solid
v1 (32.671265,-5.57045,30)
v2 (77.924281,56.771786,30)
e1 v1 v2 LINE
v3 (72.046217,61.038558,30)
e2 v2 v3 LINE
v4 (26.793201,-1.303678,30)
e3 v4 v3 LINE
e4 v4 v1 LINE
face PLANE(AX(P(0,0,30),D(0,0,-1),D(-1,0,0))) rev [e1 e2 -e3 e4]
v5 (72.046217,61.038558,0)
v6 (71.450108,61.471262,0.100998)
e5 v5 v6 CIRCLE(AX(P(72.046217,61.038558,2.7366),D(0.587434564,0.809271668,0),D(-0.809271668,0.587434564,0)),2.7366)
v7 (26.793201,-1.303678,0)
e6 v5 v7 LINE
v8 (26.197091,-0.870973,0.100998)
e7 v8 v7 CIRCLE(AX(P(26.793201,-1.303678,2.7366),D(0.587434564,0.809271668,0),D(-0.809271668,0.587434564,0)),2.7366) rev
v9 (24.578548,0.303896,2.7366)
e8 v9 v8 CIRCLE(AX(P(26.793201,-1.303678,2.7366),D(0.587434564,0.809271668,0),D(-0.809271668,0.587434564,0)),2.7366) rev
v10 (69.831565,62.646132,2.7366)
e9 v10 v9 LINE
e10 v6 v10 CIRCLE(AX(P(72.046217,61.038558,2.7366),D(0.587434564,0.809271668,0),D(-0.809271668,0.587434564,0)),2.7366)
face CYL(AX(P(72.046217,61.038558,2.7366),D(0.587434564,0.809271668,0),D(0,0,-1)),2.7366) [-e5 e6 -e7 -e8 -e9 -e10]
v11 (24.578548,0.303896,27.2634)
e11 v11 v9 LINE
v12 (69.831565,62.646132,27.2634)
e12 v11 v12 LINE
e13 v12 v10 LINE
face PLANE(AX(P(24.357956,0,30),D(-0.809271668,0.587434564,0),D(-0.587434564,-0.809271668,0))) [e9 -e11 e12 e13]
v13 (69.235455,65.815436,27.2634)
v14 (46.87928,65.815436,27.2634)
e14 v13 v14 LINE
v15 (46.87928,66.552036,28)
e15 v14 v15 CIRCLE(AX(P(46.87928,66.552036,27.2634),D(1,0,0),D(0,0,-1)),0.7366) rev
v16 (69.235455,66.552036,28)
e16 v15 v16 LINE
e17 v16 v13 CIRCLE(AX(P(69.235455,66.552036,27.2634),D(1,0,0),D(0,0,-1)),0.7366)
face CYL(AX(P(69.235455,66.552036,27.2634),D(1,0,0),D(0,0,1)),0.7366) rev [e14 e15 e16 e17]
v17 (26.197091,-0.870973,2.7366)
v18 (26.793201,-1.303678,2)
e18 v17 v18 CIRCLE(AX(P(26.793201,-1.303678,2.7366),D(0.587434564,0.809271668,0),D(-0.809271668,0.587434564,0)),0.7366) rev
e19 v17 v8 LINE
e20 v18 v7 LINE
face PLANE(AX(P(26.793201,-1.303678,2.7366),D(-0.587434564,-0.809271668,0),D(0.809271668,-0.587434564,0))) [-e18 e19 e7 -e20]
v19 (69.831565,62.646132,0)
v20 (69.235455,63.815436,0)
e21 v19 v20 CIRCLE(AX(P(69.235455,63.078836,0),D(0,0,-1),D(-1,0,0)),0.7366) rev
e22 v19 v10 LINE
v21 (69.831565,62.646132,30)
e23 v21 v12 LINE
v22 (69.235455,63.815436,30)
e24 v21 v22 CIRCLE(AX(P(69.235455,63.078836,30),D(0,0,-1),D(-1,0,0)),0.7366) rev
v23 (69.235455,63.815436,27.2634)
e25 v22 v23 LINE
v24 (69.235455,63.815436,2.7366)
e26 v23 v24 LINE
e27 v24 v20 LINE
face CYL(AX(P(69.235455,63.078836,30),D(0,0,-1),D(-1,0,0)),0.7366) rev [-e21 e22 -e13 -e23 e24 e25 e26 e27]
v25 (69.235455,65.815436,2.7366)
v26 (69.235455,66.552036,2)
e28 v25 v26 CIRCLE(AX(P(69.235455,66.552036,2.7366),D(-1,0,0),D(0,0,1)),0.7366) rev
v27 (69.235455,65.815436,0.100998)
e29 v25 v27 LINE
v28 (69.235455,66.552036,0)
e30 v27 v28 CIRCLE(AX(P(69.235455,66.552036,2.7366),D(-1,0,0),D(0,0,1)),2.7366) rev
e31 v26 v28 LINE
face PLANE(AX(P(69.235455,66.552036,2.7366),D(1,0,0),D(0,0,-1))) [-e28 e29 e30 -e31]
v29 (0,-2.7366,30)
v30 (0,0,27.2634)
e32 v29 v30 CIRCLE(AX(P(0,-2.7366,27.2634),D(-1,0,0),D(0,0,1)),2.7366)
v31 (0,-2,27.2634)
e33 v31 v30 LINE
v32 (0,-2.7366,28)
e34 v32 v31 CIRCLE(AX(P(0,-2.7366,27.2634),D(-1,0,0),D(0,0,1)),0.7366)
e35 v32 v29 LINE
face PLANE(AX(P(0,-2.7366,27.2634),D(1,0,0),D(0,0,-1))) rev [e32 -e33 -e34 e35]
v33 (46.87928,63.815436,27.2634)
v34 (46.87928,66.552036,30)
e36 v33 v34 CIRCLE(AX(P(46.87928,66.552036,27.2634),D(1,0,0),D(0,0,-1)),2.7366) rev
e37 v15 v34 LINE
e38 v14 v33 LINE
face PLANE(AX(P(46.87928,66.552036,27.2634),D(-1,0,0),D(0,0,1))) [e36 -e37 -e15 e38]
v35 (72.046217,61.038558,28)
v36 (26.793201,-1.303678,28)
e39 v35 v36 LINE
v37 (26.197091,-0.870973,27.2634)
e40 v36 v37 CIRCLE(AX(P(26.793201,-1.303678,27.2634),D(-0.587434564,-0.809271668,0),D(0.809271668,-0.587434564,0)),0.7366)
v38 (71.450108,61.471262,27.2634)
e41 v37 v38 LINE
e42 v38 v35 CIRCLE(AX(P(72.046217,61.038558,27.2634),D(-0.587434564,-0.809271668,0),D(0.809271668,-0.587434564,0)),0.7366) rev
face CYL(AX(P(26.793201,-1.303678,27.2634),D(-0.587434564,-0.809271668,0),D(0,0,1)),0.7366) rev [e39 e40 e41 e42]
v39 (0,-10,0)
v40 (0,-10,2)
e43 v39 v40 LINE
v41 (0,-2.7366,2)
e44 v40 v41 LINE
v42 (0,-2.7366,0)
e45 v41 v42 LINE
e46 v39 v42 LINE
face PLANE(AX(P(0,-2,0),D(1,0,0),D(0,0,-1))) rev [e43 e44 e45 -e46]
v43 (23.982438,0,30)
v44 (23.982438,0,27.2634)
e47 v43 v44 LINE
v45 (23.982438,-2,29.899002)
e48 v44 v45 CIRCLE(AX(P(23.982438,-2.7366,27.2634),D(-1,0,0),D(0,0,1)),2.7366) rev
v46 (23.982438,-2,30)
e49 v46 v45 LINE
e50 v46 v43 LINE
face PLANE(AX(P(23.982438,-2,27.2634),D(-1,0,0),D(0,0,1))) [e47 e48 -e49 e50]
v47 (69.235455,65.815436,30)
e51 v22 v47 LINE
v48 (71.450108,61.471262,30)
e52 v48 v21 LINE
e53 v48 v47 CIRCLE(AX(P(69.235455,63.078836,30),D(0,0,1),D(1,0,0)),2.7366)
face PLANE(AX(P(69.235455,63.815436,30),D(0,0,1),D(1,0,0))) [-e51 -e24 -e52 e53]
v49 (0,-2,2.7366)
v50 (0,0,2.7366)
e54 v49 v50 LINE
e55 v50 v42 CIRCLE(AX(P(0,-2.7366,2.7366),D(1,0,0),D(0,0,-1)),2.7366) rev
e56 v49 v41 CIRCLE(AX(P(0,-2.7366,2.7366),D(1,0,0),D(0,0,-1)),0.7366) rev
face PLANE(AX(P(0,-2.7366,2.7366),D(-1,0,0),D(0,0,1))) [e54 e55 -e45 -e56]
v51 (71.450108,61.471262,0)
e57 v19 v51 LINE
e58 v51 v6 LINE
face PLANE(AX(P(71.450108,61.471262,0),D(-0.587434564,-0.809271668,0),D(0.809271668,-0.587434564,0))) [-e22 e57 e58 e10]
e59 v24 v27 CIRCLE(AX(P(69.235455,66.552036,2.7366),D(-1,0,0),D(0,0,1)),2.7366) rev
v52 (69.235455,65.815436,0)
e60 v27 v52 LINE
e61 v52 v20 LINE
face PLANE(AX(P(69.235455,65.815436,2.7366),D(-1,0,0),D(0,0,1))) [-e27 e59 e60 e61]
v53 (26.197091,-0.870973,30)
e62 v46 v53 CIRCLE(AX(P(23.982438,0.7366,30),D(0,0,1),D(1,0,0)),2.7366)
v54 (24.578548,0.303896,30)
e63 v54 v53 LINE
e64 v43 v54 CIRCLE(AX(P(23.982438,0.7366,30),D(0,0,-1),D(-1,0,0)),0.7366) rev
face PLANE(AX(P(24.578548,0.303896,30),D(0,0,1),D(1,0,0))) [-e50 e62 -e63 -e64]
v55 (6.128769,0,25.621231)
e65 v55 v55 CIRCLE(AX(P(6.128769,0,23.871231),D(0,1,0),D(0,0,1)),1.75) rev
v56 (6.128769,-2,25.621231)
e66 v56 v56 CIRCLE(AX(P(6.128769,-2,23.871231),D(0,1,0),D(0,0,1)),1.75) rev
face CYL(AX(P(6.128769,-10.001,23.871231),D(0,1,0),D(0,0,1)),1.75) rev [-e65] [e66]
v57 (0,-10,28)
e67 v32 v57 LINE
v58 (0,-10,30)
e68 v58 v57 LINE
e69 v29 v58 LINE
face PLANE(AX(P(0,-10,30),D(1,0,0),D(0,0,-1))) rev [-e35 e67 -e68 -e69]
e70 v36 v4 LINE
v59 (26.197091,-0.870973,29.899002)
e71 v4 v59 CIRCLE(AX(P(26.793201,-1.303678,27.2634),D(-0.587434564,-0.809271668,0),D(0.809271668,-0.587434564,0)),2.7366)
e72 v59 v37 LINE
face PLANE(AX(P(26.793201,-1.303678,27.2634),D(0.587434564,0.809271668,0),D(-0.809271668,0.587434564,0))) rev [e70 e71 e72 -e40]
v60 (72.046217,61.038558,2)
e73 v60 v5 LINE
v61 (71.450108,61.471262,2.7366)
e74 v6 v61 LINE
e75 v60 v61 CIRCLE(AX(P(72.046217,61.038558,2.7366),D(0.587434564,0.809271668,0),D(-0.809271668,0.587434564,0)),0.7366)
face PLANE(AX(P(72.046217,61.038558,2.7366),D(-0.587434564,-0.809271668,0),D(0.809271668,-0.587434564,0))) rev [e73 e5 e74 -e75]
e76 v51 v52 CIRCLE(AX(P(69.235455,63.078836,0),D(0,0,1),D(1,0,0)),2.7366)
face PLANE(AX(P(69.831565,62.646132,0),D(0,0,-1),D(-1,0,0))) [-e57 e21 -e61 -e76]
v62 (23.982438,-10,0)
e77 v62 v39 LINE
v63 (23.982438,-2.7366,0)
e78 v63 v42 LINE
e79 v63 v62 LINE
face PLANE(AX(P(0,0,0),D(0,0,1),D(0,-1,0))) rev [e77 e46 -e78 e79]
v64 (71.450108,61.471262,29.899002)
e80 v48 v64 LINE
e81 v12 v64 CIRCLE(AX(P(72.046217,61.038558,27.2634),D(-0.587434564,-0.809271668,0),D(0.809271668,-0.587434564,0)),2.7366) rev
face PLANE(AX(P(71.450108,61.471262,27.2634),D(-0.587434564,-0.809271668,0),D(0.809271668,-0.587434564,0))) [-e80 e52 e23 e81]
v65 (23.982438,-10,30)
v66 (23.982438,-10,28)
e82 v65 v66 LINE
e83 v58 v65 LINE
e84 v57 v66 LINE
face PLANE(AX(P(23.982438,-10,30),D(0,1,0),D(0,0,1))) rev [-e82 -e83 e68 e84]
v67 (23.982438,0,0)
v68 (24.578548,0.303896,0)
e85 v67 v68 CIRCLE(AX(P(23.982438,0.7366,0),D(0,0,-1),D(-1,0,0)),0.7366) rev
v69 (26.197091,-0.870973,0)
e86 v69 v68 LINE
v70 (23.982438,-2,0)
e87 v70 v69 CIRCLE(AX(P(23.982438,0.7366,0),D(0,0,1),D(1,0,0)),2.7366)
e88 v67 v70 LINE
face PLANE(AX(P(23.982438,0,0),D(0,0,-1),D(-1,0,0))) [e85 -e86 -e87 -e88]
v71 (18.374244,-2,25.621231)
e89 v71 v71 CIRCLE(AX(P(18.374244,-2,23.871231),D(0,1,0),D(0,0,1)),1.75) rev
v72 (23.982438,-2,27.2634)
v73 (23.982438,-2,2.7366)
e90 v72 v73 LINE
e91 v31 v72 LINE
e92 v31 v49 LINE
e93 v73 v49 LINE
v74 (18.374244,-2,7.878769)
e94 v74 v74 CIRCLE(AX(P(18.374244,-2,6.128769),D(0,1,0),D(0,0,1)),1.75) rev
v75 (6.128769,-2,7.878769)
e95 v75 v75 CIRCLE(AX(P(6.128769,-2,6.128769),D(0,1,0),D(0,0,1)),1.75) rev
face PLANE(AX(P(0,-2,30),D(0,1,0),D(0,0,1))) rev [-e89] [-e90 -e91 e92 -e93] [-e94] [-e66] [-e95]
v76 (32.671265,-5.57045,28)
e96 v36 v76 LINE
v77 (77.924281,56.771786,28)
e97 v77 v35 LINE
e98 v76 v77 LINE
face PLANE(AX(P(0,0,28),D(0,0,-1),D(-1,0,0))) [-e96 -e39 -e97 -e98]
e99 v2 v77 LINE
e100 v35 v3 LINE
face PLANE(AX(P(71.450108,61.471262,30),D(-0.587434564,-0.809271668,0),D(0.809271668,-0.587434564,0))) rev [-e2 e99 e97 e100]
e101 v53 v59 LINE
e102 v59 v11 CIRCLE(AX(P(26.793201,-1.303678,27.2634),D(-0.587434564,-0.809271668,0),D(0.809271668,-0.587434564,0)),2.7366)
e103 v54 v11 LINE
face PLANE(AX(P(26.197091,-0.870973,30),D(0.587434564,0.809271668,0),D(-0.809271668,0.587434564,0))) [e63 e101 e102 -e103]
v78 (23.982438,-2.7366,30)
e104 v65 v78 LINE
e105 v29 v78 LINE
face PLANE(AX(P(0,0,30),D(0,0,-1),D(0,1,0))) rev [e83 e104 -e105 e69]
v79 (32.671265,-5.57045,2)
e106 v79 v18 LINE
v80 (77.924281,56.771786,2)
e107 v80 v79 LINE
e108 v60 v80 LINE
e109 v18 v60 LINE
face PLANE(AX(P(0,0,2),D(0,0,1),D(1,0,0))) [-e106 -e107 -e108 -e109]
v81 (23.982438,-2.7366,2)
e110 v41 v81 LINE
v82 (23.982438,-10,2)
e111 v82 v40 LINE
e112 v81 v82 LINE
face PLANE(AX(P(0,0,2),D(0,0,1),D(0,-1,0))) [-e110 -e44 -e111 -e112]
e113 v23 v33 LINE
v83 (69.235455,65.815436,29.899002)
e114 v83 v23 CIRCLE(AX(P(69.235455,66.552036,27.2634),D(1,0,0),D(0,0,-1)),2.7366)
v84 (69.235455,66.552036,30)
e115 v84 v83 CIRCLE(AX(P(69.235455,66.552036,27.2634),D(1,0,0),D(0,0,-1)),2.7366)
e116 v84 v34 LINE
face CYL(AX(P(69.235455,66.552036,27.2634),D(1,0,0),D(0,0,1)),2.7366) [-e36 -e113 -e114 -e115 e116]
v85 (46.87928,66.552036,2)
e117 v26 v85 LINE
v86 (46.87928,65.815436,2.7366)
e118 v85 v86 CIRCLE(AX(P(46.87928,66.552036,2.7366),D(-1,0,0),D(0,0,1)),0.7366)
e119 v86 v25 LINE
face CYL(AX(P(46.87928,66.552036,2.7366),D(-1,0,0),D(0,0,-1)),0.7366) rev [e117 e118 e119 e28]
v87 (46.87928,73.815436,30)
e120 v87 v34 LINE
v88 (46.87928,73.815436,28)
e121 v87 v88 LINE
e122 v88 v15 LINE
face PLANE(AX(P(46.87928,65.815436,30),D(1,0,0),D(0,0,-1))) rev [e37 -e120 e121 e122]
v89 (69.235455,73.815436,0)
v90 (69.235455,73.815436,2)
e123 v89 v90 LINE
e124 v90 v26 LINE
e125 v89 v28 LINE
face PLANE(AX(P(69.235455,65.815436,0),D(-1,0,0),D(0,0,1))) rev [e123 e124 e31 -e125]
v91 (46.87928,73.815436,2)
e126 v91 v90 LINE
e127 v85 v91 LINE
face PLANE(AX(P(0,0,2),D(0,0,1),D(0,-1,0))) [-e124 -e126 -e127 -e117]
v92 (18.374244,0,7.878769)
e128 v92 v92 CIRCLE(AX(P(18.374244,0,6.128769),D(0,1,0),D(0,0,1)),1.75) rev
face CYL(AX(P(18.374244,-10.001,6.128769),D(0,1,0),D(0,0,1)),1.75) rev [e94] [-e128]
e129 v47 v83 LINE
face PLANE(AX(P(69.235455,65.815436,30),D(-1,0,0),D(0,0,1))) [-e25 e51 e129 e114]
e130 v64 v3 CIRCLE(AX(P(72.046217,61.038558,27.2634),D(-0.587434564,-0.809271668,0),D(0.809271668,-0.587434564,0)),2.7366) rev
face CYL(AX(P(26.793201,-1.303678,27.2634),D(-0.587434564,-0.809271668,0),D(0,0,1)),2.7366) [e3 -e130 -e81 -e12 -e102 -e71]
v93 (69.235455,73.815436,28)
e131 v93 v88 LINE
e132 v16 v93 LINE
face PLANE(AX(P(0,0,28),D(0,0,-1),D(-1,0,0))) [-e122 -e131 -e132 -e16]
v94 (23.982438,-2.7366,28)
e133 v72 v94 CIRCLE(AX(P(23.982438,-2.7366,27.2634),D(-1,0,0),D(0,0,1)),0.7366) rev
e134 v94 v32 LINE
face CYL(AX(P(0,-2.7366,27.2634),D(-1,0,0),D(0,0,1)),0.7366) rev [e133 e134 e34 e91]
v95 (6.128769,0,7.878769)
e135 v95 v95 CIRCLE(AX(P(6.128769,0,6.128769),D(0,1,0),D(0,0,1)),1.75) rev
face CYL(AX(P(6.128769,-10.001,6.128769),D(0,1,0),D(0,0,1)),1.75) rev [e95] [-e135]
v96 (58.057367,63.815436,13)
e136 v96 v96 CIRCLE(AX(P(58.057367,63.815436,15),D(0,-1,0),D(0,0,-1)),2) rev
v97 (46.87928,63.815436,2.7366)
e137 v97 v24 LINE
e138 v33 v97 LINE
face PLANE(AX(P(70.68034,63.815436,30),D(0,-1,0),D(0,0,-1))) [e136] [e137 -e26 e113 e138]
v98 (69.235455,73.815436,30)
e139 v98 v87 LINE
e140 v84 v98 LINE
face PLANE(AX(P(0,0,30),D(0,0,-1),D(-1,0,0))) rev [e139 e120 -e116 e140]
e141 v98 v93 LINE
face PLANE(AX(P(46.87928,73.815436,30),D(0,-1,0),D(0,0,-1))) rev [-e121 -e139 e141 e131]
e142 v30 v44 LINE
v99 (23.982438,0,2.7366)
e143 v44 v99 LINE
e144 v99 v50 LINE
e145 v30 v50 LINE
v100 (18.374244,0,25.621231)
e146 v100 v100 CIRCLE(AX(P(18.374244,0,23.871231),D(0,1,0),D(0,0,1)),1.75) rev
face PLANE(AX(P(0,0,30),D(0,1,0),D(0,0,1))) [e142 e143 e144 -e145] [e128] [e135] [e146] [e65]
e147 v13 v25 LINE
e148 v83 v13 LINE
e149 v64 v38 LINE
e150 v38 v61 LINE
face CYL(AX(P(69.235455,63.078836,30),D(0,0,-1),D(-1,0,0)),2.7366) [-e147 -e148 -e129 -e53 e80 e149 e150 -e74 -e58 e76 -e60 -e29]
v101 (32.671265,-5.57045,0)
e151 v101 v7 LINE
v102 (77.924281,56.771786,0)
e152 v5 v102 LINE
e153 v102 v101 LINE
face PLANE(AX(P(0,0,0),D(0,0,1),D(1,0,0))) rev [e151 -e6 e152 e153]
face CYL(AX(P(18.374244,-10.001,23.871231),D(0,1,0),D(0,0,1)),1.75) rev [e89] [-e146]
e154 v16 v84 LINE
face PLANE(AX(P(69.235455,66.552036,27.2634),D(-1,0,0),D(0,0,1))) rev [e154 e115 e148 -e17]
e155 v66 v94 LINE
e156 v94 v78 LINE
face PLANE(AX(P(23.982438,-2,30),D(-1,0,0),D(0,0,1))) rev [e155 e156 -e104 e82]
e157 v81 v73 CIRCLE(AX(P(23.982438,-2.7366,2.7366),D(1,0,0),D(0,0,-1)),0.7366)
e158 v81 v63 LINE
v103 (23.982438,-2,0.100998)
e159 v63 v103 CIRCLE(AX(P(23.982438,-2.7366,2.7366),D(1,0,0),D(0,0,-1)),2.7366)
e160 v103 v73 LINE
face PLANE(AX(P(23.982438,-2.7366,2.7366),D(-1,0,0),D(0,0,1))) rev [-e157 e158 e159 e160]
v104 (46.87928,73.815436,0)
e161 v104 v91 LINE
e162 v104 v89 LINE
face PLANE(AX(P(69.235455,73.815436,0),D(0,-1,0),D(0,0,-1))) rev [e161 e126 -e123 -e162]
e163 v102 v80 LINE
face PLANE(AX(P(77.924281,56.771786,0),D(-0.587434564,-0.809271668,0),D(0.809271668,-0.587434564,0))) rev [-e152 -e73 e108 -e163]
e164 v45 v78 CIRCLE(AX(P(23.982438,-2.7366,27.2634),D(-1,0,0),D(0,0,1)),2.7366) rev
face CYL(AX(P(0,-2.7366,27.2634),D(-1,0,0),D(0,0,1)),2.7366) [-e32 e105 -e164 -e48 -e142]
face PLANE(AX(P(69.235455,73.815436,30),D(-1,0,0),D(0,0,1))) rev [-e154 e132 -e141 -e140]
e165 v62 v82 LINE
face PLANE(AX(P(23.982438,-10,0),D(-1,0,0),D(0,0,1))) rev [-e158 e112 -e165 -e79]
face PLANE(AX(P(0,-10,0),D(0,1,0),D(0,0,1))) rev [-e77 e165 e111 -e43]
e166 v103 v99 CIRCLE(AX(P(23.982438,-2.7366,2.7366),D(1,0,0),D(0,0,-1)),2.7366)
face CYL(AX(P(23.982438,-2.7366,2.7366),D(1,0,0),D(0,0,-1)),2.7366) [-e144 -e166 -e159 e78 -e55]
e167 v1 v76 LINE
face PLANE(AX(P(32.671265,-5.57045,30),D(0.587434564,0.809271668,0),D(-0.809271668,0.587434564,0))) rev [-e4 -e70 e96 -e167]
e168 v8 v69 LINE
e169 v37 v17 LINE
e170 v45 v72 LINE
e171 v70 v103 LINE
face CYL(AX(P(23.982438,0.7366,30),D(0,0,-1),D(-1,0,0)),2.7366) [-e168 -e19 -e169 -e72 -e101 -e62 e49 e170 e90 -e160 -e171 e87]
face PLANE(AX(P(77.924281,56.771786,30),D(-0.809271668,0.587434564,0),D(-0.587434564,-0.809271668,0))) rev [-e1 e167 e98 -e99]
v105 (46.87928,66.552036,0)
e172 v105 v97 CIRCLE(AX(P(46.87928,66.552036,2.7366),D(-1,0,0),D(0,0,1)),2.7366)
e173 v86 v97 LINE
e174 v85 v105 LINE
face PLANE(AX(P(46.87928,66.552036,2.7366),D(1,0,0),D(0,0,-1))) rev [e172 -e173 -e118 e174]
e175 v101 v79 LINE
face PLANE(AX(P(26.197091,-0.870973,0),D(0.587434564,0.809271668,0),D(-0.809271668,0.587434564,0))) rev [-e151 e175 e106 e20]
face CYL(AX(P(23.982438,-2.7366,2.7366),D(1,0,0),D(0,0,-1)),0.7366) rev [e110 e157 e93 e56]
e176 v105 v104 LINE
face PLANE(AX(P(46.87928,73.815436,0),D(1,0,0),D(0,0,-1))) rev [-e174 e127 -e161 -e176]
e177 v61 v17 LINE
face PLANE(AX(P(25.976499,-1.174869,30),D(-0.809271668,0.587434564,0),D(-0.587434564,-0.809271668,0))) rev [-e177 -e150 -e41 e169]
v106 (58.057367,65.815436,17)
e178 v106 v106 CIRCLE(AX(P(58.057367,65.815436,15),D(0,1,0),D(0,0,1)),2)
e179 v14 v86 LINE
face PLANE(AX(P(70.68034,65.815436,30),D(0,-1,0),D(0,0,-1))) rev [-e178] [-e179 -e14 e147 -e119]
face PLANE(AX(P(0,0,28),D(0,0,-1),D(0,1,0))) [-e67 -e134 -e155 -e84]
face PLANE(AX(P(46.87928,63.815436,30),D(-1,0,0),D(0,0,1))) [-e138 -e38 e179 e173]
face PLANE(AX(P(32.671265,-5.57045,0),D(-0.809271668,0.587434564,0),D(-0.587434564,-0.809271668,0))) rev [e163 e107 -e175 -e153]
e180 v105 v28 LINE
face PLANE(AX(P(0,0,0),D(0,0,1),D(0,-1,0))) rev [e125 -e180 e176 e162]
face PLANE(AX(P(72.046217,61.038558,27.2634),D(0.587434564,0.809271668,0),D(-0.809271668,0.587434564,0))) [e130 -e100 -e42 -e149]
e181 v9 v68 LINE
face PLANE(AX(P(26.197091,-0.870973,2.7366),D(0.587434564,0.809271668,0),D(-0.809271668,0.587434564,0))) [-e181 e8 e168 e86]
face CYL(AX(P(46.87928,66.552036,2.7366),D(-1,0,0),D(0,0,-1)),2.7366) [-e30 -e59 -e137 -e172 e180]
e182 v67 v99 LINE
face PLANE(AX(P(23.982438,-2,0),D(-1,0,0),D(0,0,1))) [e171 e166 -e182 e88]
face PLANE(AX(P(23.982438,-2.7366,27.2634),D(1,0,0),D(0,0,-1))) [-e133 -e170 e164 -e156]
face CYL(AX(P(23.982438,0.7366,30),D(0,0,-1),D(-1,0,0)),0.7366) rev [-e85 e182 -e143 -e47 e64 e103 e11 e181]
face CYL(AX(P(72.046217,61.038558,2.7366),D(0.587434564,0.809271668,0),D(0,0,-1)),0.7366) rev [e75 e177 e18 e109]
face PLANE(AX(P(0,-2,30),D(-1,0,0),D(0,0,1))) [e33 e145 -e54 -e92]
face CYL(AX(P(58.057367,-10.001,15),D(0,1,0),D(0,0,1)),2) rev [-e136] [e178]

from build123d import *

# Parameters (mm, degrees)
BASE_FLANGE1_DEPTH             = 30
EDGE_FLANGE3_STRIP_W           = 9.4732
EDGE_FLANGE3_STRIP_H           = 2
EDGE_FLANGE3_STRIP_CUT_DEPTH   = 23.982438423
EDGE_FLANGE3_STRIP_2_W         = 9.4732
EDGE_FLANGE3_STRIP_2_H         = 2
EDGE_FLANGE3_STRIP_CUT_2_DEPTH = 23.982438423
EDGE_FLANGE3_STRIP_3_W         = 9.4732
EDGE_FLANGE3_STRIP_3_H         = 2
EDGE_FLANGE3_STRIP_CUT_3_DEPTH = 22.356175112
EDGE_FLANGE3_STRIP_4_W         = 9.4732
EDGE_FLANGE3_STRIP_4_H         = 2
EDGE_FLANGE3_STRIP_CUT_4_DEPTH = 22.356175112
EDGE_FLANGE3_STRIP_5_W         = 9.4732
EDGE_FLANGE3_STRIP_5_H         = 2
EDGE_FLANGE3_STRIP_CUT_5_DEPTH = 77.034991311
EDGE_FLANGE3_STRIP_6_W         = 9.4732
EDGE_FLANGE3_STRIP_6_H         = 2
EDGE_FLANGE3_STRIP_CUT_6_DEPTH = 77.034991311
EDGE_FLANGE3_DEPTH             = 23.982438423
EDGE_FLANGE3_BEND_DEPTH        = 23.982438423
EDGE_FLANGE3_BEND_2_DEPTH      = 22.356175112
EDGE_FLANGE3_BEND_3_DEPTH      = 22.356175112
EDGE_FLANGE3_BEND_4_DEPTH      = 77.034991311
EDGE_FLANGE3_BEND_5_DEPTH      = 77.034991311
CUT_EXTRUDE1_REACH             = 114.784
SKETCH35_R                     = 1.75
SKETCH35_R_2                   = 2


# Sheet-metal steps are written as plain solids
with BuildPart() as part:
    # Sketch1 → Base-Flange1 (new body)
    with BuildSketch(Plane.XY):
        with BuildLine():
            Line((0, 0), (23.982438423, 0))
            ThreePointArc((23.982438423, 0), (24.316990043, 0.080357077), (24.578547934, 0.3038957))
            Line((24.578547934, 0.3038957), (69.831564503, 62.646131606))
            ThreePointArc((69.831564503, 62.646131606), (69.891697915, 63.413387526), (69.235454992, 63.815435906))
            Line((69.235454992, 63.815435906), (46.87927988, 63.815435906))
            Line((46.87927988, 63.815435906), (46.87927988, 65.815435906))
            Line((46.87927988, 65.815435906), (69.235454992, 65.815435906))
            ThreePointArc((69.235454992, 65.815435906), (71.673514159, 64.321754671), (71.450107838, 61.471262477))
            Line((71.450107838, 61.471262477), (26.19709127, -0.870973429))
            ThreePointArc((26.19709127, -0.870973429), (25.225357188, -1.701459167), (23.982438423, -2))
            Line((23.982438423, -2), (0, -2))
            Line((0, -2), (0, 0))
        make_face()
    extrude(amount=BASE_FLANGE1_DEPTH)

    # Edge-Flange3 strip (across the edge) → Edge-Flange3 strip cut (cut)
    with BuildSketch(Plane(origin=(0, -2, 0), x_dir=(0, 0, 1), z_dir=(1, 0, 0))):
        with Locations((-2, -1)):
            Rectangle(EDGE_FLANGE3_STRIP_W, EDGE_FLANGE3_STRIP_H)
    extrude(amount=EDGE_FLANGE3_STRIP_CUT_DEPTH, mode=Mode.SUBTRACT)

    # Edge-Flange3 strip 2 (across the edge) → Edge-Flange3 strip cut 2 (cut)
    with BuildSketch(Plane(origin=(23.982438423, -2, 30), x_dir=(0, 0, -1), z_dir=(-1, 0, 0))):
        with Locations((-2, -1)):
            Rectangle(EDGE_FLANGE3_STRIP_2_W, EDGE_FLANGE3_STRIP_2_H)
    extrude(amount=EDGE_FLANGE3_STRIP_CUT_2_DEPTH, mode=Mode.SUBTRACT)

    # Edge-Flange3 strip 3 (across the edge) → Edge-Flange3 strip cut 3 (cut)
    with BuildSketch(Plane(origin=(46.87927988, 65.815435906, 30), x_dir=(0, 0, -1), z_dir=(1, 0, 0))):
        with Locations((-2, -1)):
            Rectangle(EDGE_FLANGE3_STRIP_3_W, EDGE_FLANGE3_STRIP_3_H)
    extrude(amount=EDGE_FLANGE3_STRIP_CUT_3_DEPTH, mode=Mode.SUBTRACT)

    # Edge-Flange3 strip 4 (across the edge) → Edge-Flange3 strip cut 4 (cut)
    with BuildSketch(Plane(origin=(69.235454992, 65.815435906, 0), x_dir=(0, 0, 1), z_dir=(-1, 0, 0))):
        with Locations((-2, -1)):
            Rectangle(EDGE_FLANGE3_STRIP_4_W, EDGE_FLANGE3_STRIP_4_H)
    extrude(amount=EDGE_FLANGE3_STRIP_CUT_4_DEPTH, mode=Mode.SUBTRACT)

    # Edge-Flange3 strip 5 (across the edge) → Edge-Flange3 strip cut 5 (cut)
    with BuildSketch(Plane(origin=(26.19709127, -0.870973429, 0), x_dir=(0, 0, 1), z_dir=(0.5874345644557342, 0.8092716679105367, 0))):
        with Locations((-2, -1)):
            Rectangle(EDGE_FLANGE3_STRIP_5_W, EDGE_FLANGE3_STRIP_5_H)
    extrude(amount=EDGE_FLANGE3_STRIP_CUT_5_DEPTH, mode=Mode.SUBTRACT)

    # Edge-Flange3 strip 6 (across the edge) → Edge-Flange3 strip cut 6 (cut)
    with BuildSketch(Plane(origin=(71.450107838, 61.471262477, 30), x_dir=(0, 0, -1), z_dir=(-0.5874345644557342, -0.8092716679105367, 0))):
        with Locations((-2, -1)):
            Rectangle(EDGE_FLANGE3_STRIP_6_W, EDGE_FLANGE3_STRIP_6_H)
    extrude(amount=EDGE_FLANGE3_STRIP_CUT_6_DEPTH, mode=Mode.SUBTRACT)

    # Edge-Flange3 section (across the edge) → Edge-Flange3 (add)
    with BuildSketch(Plane(origin=(0, -2, 0), x_dir=(0, 0, 1), z_dir=(1, 0, 0))):
        with BuildLine():
            Line((0, 0.7366), (0, 8))
            Line((0, 8), (2, 8))
            Line((2, 8), (2, 0.7366))
            ThreePointArc((2, 0.7366), (2.215745145, 0.215745145), (2.7366, 0))
            Line((2.7366, 0), (2.7366, -2))
            ThreePointArc((2.7366, -2), (0.801531583, -1.198468417), (0, 0.7366))
        make_face()
    extrude(amount=EDGE_FLANGE3_DEPTH)

    # Edge-Flange3 section 2 (across the edge) → Edge-Flange3 bend (add)
    with BuildSketch(Plane(origin=(23.982438423, -2, 30), x_dir=(0, 0, -1), z_dir=(-1, 0, 0))):
        with BuildLine():
            Line((0, 0.7366), (0, 8))
            Line((0, 8), (2, 8))
            Line((2, 8), (2, 0.7366))
            ThreePointArc((2, 0.7366), (2.215745145, 0.215745145), (2.7366, 0))
            Line((2.7366, 0), (2.7366, -2))
            ThreePointArc((2.7366, -2), (0.801531583, -1.198468417), (0, 0.7366))
        make_face()
    extrude(amount=EDGE_FLANGE3_BEND_DEPTH)

    # Edge-Flange3 section 3 (across the edge) → Edge-Flange3 bend 2 (add)
    with BuildSketch(Plane(origin=(46.87927988, 65.815435906, 30), x_dir=(0, 0, -1), z_dir=(1, 0, 0))):
        with BuildLine():
            Line((0, 0.7366), (0, 8))
            Line((0, 8), (2, 8))
            Line((2, 8), (2, 0.7366))
            ThreePointArc((2, 0.7366), (2.215745145, 0.215745145), (2.7366, 0))
            Line((2.7366, 0), (2.7366, -2))
            ThreePointArc((2.7366, -2), (0.801531583, -1.198468417), (0, 0.7366))
        make_face()
    extrude(amount=EDGE_FLANGE3_BEND_2_DEPTH)

    # Edge-Flange3 section 4 (across the edge) → Edge-Flange3 bend 3 (add)
    with BuildSketch(Plane(origin=(69.235454992, 65.815435906, 0), x_dir=(0, 0, 1), z_dir=(-1, 0, 0))):
        with BuildLine():
            Line((0, 0.7366), (0, 8))
            Line((0, 8), (2, 8))
            Line((2, 8), (2, 0.7366))
            ThreePointArc((2, 0.7366), (2.215745145, 0.215745145), (2.7366, 0))
            Line((2.7366, 0), (2.7366, -2))
            ThreePointArc((2.7366, -2), (0.801531583, -1.198468417), (0, 0.7366))
        make_face()
    extrude(amount=EDGE_FLANGE3_BEND_3_DEPTH)

    # Edge-Flange3 section 5 (across the edge) → Edge-Flange3 bend 4 (add)
    with BuildSketch(Plane(origin=(26.19709127, -0.870973429, 0), x_dir=(0, 0, 1), z_dir=(0.5874345644557342, 0.8092716679105367, 0))):
        with BuildLine():
            Line((0, 0.7366), (0, 8))
            Line((0, 8), (2, 8))
            Line((2, 8), (2, 0.7366))
            ThreePointArc((2, 0.7366), (2.215745145, 0.215745145), (2.7366, 0))
            Line((2.7366, 0), (2.7366, -2))
            ThreePointArc((2.7366, -2), (0.801531583, -1.198468417), (0, 0.7366))
        make_face()
    extrude(amount=EDGE_FLANGE3_BEND_4_DEPTH)

    # Edge-Flange3 section 6 (across the edge) → Edge-Flange3 bend 5 (add)
    with BuildSketch(Plane(origin=(71.450107838, 61.471262477, 30), x_dir=(0, 0, -1), z_dir=(-0.5874345644557342, -0.8092716679105367, 0))):
        with BuildLine():
            Line((0, 0.7366), (0, 8))
            Line((0, 8), (2, 8))
            Line((2, 8), (2, 0.7366))
            ThreePointArc((2, 0.7366), (2.215745145, 0.215745145), (2.7366, 0))
            Line((2.7366, 0), (2.7366, -2))
            ThreePointArc((2.7366, -2), (0.801531583, -1.198468417), (0, 0.7366))
        make_face()
    extrude(amount=EDGE_FLANGE3_BEND_5_DEPTH)

    # Sketch35 → Cut-Extrude1 (cut, up to next)
    with BuildSketch(Plane(origin=(0, 65.815435906, 0), x_dir=(1, 0, 0), z_dir=(0, 1, 0)), mode=Mode.PRIVATE) as cut_extrude1_sk1:
        with Locations(Location((6.128769165, -6.128769165, 0), (0, 0, 270))):
            Circle(SKETCH35_R)
    cut_extrude1_tool1 = extrude(cut_extrude1_sk1.sketch, amount=-CUT_EXTRUDE1_REACH, mode=Mode.PRIVATE) & part.part
    # Sketch35 → Cut-Extrude1 (cut, up to next)
    with BuildSketch(Plane(origin=(0, 65.815435906, 0), x_dir=(1, 0, 0), z_dir=(0, 1, 0)), mode=Mode.PRIVATE) as cut_extrude1_sk2:
        with Locations(Location((18.374243868, -6.128769165, 0), (0, 0, 270))):
            Circle(SKETCH35_R)
    cut_extrude1_tool2 = extrude(cut_extrude1_sk2.sketch, amount=-CUT_EXTRUDE1_REACH, mode=Mode.PRIVATE) & part.part
    # Sketch35 → Cut-Extrude1 (cut, up to next)
    with BuildSketch(Plane(origin=(0, 65.815435906, 0), x_dir=(1, 0, 0), z_dir=(0, 1, 0)), mode=Mode.PRIVATE) as cut_extrude1_sk3:
        with Locations(Location((6.128769165, -23.871230835, 0), (0, 0, 270))):
            Circle(SKETCH35_R)
    cut_extrude1_tool3 = extrude(cut_extrude1_sk3.sketch, amount=-CUT_EXTRUDE1_REACH, mode=Mode.PRIVATE) & part.part
    # Sketch35 → Cut-Extrude1 (cut, up to next)
    with BuildSketch(Plane(origin=(0, 65.815435906, 0), x_dir=(1, 0, 0), z_dir=(0, 1, 0)), mode=Mode.PRIVATE) as cut_extrude1_sk4:
        with Locations(Location((18.374243868, -23.871230835, 0), (0, 0, 270))):
            Circle(SKETCH35_R)
    cut_extrude1_tool4 = extrude(cut_extrude1_sk4.sketch, amount=-CUT_EXTRUDE1_REACH, mode=Mode.PRIVATE) & part.part
    # Sketch35 → Cut-Extrude1 (cut, up to next)
    with BuildSketch(Plane(origin=(0, 65.815435906, 0), x_dir=(1, 0, 0), z_dir=(0, 1, 0)), mode=Mode.PRIVATE) as cut_extrude1_sk5:
        with Locations(Location((58.057367436, -15, 0), (0, 0, 270))):
            Circle(SKETCH35_R_2)
    cut_extrude1_tool5 = extrude(cut_extrude1_sk5.sketch, amount=-CUT_EXTRUDE1_REACH, mode=Mode.PRIVATE) & part.part
    add(cut_extrude1_tool1.solids().sort_by_distance((6.128769, 65.815436, 6.128769))[0], mode=Mode.SUBTRACT)
    add(cut_extrude1_tool2.solids().sort_by_distance((18.374244, 65.815436, 6.128769))[0], mode=Mode.SUBTRACT)
    add(cut_extrude1_tool3.solids().sort_by_distance((6.128769, 65.815436, 23.871231))[0], mode=Mode.SUBTRACT)
    add(cut_extrude1_tool4.solids().sort_by_distance((18.374244, 65.815436, 23.871231))[0], mode=Mode.SUBTRACT)
    add(cut_extrude1_tool5.solids().sort_by_distance((58.057367, 65.815436, 15))[0], mode=Mode.SUBTRACT)


solid = part.part
